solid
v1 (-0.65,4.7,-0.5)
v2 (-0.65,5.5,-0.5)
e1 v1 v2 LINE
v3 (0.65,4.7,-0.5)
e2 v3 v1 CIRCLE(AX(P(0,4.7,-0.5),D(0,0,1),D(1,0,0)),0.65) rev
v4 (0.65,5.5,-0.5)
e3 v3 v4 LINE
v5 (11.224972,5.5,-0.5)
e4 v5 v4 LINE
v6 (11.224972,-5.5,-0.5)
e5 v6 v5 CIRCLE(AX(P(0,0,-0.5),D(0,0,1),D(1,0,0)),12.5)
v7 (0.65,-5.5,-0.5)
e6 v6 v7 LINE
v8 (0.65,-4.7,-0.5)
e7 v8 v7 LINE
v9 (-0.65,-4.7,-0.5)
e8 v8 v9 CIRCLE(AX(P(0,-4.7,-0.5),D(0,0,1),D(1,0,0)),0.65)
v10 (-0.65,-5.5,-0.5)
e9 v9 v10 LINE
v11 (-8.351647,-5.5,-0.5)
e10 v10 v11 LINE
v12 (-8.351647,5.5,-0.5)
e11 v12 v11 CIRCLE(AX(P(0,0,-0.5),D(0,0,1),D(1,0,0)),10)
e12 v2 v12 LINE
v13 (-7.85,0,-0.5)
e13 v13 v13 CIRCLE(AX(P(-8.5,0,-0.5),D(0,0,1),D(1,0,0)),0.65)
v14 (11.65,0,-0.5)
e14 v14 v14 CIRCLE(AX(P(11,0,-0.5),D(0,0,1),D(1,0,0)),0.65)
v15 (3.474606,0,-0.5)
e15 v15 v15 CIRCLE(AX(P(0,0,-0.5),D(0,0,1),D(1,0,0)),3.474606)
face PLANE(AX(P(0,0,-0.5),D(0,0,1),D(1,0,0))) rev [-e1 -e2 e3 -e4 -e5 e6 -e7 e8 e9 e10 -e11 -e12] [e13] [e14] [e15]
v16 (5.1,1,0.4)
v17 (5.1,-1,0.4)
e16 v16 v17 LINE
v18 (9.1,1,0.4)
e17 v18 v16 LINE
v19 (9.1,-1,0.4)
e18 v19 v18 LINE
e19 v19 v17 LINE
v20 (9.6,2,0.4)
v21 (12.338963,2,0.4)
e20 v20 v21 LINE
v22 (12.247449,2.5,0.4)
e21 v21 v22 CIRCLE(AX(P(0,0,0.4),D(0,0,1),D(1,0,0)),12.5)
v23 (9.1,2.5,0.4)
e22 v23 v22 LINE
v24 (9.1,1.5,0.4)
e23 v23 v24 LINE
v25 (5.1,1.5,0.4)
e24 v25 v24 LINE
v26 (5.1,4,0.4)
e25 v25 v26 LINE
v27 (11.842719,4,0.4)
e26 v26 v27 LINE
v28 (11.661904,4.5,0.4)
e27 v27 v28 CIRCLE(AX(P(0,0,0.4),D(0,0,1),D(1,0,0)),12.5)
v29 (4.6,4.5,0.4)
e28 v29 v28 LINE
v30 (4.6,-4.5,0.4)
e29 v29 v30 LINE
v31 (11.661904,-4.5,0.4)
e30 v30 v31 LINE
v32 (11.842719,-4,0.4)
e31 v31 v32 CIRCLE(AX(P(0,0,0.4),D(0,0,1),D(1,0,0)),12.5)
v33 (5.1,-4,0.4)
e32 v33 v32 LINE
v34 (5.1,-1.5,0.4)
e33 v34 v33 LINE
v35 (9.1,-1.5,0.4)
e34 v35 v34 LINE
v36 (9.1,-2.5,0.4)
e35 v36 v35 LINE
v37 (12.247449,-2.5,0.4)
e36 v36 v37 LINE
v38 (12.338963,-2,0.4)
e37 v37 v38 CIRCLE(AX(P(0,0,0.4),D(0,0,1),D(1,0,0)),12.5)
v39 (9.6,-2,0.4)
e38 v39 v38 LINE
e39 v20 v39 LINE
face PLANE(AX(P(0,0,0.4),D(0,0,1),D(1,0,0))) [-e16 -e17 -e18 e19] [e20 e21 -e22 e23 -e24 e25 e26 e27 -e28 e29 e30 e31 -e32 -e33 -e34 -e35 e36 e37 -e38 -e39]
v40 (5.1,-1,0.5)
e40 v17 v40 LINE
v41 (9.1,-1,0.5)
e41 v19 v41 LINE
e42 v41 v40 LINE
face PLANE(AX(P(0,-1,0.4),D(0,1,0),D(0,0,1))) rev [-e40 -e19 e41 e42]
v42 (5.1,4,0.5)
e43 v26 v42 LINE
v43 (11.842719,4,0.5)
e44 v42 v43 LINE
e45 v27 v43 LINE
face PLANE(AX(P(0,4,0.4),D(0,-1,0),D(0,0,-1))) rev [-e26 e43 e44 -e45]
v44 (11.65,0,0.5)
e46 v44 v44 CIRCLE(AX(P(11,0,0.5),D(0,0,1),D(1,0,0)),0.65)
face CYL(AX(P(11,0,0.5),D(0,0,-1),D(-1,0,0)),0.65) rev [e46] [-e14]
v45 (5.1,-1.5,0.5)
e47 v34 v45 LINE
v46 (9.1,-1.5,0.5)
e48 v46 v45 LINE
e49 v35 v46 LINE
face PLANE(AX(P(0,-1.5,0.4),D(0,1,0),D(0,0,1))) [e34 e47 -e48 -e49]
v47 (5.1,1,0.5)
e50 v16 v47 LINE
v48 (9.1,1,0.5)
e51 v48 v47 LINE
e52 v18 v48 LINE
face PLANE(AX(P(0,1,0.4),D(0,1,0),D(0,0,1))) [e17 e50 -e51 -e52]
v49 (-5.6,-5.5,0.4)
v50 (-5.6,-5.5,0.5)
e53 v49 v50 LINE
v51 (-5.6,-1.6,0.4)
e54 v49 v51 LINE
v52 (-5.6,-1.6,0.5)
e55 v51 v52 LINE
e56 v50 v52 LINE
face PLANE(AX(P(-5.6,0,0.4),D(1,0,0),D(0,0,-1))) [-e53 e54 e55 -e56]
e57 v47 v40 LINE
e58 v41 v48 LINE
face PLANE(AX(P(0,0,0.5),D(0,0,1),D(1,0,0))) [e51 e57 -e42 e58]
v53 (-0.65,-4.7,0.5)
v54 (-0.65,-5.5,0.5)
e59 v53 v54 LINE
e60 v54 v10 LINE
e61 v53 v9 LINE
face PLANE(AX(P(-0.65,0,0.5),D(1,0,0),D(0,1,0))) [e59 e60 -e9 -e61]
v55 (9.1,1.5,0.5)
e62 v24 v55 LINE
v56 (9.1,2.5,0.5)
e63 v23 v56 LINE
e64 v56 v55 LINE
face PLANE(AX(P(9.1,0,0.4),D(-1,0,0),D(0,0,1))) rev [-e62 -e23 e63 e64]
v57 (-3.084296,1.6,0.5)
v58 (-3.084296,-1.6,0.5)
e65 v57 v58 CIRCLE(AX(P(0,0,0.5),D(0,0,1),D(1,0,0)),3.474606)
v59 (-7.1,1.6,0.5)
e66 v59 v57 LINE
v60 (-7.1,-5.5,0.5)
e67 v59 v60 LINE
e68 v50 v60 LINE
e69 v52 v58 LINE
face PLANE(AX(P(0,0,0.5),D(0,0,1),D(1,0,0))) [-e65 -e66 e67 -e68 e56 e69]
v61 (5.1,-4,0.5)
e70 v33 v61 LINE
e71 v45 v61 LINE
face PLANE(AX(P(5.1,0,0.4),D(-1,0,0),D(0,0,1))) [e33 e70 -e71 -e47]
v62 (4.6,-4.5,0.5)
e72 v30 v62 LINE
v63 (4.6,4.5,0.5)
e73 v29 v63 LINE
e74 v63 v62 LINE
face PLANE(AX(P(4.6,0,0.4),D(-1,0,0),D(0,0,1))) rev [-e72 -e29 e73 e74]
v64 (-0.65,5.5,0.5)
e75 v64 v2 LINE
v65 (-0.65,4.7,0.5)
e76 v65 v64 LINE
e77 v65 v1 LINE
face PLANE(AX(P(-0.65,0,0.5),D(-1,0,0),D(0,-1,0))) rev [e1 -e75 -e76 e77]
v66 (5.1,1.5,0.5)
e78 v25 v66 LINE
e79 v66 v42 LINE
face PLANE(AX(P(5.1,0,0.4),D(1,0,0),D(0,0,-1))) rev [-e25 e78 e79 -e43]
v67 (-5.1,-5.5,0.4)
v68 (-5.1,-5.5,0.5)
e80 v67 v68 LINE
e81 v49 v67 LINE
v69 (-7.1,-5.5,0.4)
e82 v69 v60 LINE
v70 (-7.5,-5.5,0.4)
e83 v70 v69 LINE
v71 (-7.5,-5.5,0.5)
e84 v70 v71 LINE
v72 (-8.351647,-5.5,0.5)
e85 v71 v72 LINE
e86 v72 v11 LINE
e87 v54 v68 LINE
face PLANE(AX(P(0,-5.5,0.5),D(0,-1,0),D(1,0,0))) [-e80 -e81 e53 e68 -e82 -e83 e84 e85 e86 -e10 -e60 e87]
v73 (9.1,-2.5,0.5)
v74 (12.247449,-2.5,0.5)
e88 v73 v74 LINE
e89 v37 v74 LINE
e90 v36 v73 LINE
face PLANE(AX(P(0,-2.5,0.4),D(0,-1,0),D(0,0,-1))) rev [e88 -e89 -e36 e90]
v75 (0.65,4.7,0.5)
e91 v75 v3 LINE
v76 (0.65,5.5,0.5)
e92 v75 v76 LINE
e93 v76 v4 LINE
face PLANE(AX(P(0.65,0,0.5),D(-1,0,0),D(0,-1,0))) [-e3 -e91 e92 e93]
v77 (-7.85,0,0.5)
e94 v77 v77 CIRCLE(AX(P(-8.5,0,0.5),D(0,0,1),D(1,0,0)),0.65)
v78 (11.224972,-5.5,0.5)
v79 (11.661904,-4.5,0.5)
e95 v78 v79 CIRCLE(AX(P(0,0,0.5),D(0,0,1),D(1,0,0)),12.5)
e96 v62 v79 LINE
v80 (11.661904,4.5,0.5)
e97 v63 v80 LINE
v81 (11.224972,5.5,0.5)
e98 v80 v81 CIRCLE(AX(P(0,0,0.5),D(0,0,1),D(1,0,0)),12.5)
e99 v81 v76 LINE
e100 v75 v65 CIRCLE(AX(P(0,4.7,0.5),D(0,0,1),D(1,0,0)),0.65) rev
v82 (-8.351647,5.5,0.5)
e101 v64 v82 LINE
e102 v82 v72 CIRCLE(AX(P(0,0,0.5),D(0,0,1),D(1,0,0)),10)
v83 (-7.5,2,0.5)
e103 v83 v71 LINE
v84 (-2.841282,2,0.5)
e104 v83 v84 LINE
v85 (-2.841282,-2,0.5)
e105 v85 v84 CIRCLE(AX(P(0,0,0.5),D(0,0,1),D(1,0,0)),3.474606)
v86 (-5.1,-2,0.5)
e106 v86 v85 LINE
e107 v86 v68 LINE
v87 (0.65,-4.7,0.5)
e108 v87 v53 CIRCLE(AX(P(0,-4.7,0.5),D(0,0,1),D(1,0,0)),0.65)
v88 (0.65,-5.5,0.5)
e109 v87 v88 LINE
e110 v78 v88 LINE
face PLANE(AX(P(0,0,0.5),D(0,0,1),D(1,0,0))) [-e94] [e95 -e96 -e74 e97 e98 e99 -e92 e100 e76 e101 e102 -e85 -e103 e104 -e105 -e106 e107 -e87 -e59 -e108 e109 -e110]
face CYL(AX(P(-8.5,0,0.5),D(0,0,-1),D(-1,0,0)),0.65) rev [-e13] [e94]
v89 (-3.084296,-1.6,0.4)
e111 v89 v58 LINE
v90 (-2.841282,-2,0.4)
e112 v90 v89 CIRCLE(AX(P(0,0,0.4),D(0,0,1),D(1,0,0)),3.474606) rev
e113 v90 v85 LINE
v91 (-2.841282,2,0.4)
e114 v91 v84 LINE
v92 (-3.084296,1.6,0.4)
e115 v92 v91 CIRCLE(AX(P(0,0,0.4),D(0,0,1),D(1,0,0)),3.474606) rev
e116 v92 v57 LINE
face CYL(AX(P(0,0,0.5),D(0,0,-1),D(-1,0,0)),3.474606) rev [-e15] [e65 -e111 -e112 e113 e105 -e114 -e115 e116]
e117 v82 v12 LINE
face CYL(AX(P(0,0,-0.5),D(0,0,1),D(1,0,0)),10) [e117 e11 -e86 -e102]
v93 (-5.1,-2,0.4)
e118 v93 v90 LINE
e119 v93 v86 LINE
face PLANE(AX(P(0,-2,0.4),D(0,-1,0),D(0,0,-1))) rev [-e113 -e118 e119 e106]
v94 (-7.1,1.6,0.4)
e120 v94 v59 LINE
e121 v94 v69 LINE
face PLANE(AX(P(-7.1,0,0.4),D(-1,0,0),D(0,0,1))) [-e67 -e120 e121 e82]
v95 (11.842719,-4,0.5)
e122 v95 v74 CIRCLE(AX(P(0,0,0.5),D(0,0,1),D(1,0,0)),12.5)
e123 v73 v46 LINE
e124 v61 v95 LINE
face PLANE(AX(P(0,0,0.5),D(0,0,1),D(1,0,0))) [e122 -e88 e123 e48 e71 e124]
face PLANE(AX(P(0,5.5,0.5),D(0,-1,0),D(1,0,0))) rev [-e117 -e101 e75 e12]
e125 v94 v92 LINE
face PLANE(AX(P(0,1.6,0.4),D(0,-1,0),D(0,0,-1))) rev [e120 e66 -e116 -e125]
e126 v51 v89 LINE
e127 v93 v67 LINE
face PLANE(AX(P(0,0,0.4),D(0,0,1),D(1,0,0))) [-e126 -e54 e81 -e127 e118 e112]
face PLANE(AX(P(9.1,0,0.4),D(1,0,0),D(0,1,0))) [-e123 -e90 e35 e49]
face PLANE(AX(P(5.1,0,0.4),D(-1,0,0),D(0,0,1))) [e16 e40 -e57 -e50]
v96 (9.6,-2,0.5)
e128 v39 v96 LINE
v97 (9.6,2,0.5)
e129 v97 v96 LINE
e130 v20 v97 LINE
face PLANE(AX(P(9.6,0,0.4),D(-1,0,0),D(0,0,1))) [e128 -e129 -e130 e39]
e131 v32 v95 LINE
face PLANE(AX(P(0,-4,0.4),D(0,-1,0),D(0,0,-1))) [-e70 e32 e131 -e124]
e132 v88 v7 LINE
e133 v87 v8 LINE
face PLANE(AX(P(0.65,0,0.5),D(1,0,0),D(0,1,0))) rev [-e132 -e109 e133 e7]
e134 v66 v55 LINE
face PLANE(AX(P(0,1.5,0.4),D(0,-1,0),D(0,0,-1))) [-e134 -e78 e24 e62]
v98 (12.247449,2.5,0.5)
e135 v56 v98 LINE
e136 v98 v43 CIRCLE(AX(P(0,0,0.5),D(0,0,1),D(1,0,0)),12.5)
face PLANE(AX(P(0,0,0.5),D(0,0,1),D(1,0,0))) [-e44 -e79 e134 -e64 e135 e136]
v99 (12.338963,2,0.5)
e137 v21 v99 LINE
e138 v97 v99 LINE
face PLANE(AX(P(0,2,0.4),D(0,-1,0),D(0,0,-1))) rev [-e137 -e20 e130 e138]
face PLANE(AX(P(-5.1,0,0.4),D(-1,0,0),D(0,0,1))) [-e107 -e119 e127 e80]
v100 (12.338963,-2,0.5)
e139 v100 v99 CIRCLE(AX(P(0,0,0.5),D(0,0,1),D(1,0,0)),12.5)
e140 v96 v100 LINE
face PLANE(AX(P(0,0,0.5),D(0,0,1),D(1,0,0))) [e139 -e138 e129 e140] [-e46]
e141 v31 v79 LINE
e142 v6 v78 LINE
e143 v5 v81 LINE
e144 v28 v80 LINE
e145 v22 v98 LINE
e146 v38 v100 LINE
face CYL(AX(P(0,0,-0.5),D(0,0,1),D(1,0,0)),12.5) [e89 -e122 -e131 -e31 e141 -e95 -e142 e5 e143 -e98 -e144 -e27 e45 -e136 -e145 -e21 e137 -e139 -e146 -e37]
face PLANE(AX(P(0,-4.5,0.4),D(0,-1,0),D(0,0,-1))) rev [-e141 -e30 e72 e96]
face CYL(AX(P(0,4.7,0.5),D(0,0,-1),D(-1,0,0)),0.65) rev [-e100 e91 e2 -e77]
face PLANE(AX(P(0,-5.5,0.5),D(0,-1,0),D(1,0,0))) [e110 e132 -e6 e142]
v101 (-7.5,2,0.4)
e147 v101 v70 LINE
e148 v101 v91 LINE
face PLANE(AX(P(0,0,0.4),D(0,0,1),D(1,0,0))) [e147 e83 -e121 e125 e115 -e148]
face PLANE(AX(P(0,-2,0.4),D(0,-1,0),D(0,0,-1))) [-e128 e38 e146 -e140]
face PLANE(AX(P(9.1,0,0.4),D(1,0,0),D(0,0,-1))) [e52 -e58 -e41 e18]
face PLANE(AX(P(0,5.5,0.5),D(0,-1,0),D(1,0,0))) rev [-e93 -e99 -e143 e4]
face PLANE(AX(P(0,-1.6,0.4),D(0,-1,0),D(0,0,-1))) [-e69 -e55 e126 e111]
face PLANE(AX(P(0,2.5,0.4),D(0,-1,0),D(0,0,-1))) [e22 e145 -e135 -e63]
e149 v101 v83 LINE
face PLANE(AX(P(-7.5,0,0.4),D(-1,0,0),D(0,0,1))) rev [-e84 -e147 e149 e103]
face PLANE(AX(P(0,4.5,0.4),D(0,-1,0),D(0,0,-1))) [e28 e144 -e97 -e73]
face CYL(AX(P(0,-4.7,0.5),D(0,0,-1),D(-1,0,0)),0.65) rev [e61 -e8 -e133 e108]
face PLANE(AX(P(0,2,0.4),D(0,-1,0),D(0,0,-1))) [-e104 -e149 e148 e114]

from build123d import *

# Parameters (mm, degrees)
MODEL_R         = 0.65
MODEL_R_2       = 3.4746057
EXTRUDE_1_DEPTH = 0.5
EXTRUDE1_START  = -0.5
EXTRUDE1_DEPTH  = 1
EXTRUDE2_START  = -0.1
EXTRUDE2_DEPTH  = 0.1


# Read off the part's stored shape, not the designer's step: Extrude1
with BuildPart() as part:
    # Model → Бобышка-Вытянуть1 (new, symmetric)
    with BuildSketch(Plane.XY):
        with BuildLine():
            Line((0.65, -4.7), (0.65, -5.5))
            Line((0.65, -5.5), (12.5, -5.5))
            Line((12.5, -5.5), (12.5, 5.5))
            Line((12.5, 5.5), (0.65, 5.5))
            Line((0.65, 5.5), (0.65, 4.7))
            ThreePointArc((0.65, 4.7), (0, 4.05), (-0.65, 4.7))
            Line((-0.65, 4.7), (-0.65, 5.5))
            Line((-0.65, 5.5), (-10, 5.5))
            Line((-10, 5.5), (-10, -5.5))
            Line((-10, -5.5), (-0.65, -5.5))
            Line((-0.65, -5.5), (-0.65, -4.7))
            ThreePointArc((-0.65, -4.7), (0, -4.05), (0.65, -4.7))
        make_face()
        with Locations((-8.5, 0)):
            Circle(MODEL_R, mode=Mode.SUBTRACT)
        Circle(MODEL_R_2, mode=Mode.SUBTRACT)
        with Locations((11, 0)):
            Circle(MODEL_R, mode=Mode.SUBTRACT)
    extrude(amount=EXTRUDE_1_DEPTH, both=True)

    # Extrude1 outline → Extrude1 (cut)
    with BuildSketch(Plane.XY.offset(EXTRUDE1_START)):
        with BuildLine():
            ThreePointArc((11.22497216, 5.5), (12.177071733, 2.822928267), (12.5, 0))
            Line((12.5, 0), (12.5, 5.5))
            Line((12.5, 5.5), (11.22497216, 5.5))
        make_face()
        with BuildLine():
            ThreePointArc((12.5, 0), (12.177071733, -2.822928267), (11.22497216, -5.5))
            Line((11.22497216, -5.5), (12.5, -5.5))
            Line((12.5, -5.5), (12.5, 0))
        make_face()
        with BuildLine():
            ThreePointArc((-8.351646544, -5.5), (-9.579051769, -2.87084782), (-10, 2.7e-08))
            Line((-10, 2.7e-08), (-10, -5.5))
            Line((-10, -5.5), (-8.351646544, -5.5))
        make_face()
        with BuildLine():
            ThreePointArc((-10, 2.7e-08), (-9.579051761, 2.870847846), (-8.351646544, 5.5))
            Line((-8.351646544, 5.5), (-10, 5.5))
            Line((-10, 5.5), (-10, 2.7e-08))
        make_face()
    extrude(amount=EXTRUDE1_DEPTH, mode=Mode.SUBTRACT)

    # Sketch2 → Extrude2 (cut)
    # profile 1 of 3: a face of its own
    with BuildSketch(Plane.XY.offset(0.5).offset(EXTRUDE2_START)):
        with BuildLine():
            Line((-5.6, -5.5), (-5.1, -5.5))
            Line((-5.1, -5.5), (-5.1, -2))
            Line((-5.1, -2), (-3.7, -2))
            Line((-3.7, -2), (-2.841282241, -2))
            ThreePointArc((-2.841282241, -2), (-2.969532083, -1.804096444), (-3.084296479, -1.6))
            Line((-3.084296479, -1.6), (-4.1, -1.6))
            Line((-4.1, -1.6), (-5.6, -1.6))
            Line((-5.6, -1.6), (-5.6, -5.5))
        make_face()
    # profile 2 of 3: a face of its own
    with BuildSketch(Plane.XY.offset(0.5).offset(EXTRUDE2_START)):
        with BuildLine():
            Line((-7.5, -5.5), (-7.1, -5.5))
            Line((-7.1, -5.5), (-7.1, -1.6))
            Line((-7.1, -1.6), (-7.1, 1.6))
            Line((-7.1, 1.6), (-4.1, 1.6))
            Line((-4.1, 1.6), (-3.084296479, 1.6))
            ThreePointArc((-3.084296479, 1.6), (-2.969532083, 1.804096444), (-2.841282241, 2))
            Line((-2.841282241, 2), (-3.7, 2))
            Line((-3.7, 2), (-7.5, 2))
            Line((-7.5, 2), (-7.5, -2))
            Line((-7.5, -2), (-7.5, -5.5))
        make_face()
    # profile 3 of 3: a face of its own
    with BuildSketch(Plane.XY.offset(0.5).offset(EXTRUDE2_START)):
        with BuildLine():
            Line((4.6, -4.5), (11.66190379, -4.5))
            ThreePointArc((11.66190379, -4.5), (11.754970287, -4.250961487), (11.842719282, -4))
            Line((11.842719282, -4), (9.1, -4))
            Line((9.1, -4), (5.1, -4))
            Line((5.1, -4), (5.1, -1.5))
            Line((5.1, -1.5), (6.1, -1.5))
            Line((6.1, -1.5), (9.1, -1.5))
            Line((9.1, -1.5), (9.1, -2.5))
            Line((9.1, -2.5), (12.247448714, -2.5))
            ThreePointArc((12.247448714, -2.5), (12.295747488, -2.250465219), (12.338962679, -2))
            Line((12.338962679, -2), (9.6, -2))
            Line((9.6, -2), (9.6, -1.5))
            Line((9.6, -1.5), (9.6, 1.5))
            Line((9.6, 1.5), (9.6, 2))
            Line((9.6, 2), (12.338962679, 2))
            ThreePointArc((12.338962679, 2), (12.295747488, 2.250465219), (12.247448714, 2.5))
            Line((12.247448714, 2.5), (9.1, 2.5))
            Line((9.1, 2.5), (9.1, 1.5))
            Line((9.1, 1.5), (6.1, 1.5))
            Line((6.1, 1.5), (5.1, 1.5))
            Line((5.1, 1.5), (5.1, 4))
            Line((5.1, 4), (9.1, 4))
            Line((9.1, 4), (11.842719282, 4))
            ThreePointArc((11.842719282, 4), (11.754970287, 4.250961487), (11.66190379, 4.5))
            Line((11.66190379, 4.5), (4.6, 4.5))
            Line((4.6, 4.5), (4.6, 4))
            Line((4.6, 4), (4.6, 1.5))
            Line((4.6, 1.5), (4.6, -1.5))
            Line((4.6, -1.5), (4.6, -4))
            Line((4.6, -4), (4.6, -4.5))
        make_face()
        Polygon((9.1, 1), (9.1, -1), (6.1, -1), (5.1, -1), (5.1, 0.813952094), (5.1, 1), (6.1, 1), align=None, mode=Mode.SUBTRACT)
    extrude(amount=EXTRUDE2_DEPTH, mode=Mode.SUBTRACT)


solid = part.part
